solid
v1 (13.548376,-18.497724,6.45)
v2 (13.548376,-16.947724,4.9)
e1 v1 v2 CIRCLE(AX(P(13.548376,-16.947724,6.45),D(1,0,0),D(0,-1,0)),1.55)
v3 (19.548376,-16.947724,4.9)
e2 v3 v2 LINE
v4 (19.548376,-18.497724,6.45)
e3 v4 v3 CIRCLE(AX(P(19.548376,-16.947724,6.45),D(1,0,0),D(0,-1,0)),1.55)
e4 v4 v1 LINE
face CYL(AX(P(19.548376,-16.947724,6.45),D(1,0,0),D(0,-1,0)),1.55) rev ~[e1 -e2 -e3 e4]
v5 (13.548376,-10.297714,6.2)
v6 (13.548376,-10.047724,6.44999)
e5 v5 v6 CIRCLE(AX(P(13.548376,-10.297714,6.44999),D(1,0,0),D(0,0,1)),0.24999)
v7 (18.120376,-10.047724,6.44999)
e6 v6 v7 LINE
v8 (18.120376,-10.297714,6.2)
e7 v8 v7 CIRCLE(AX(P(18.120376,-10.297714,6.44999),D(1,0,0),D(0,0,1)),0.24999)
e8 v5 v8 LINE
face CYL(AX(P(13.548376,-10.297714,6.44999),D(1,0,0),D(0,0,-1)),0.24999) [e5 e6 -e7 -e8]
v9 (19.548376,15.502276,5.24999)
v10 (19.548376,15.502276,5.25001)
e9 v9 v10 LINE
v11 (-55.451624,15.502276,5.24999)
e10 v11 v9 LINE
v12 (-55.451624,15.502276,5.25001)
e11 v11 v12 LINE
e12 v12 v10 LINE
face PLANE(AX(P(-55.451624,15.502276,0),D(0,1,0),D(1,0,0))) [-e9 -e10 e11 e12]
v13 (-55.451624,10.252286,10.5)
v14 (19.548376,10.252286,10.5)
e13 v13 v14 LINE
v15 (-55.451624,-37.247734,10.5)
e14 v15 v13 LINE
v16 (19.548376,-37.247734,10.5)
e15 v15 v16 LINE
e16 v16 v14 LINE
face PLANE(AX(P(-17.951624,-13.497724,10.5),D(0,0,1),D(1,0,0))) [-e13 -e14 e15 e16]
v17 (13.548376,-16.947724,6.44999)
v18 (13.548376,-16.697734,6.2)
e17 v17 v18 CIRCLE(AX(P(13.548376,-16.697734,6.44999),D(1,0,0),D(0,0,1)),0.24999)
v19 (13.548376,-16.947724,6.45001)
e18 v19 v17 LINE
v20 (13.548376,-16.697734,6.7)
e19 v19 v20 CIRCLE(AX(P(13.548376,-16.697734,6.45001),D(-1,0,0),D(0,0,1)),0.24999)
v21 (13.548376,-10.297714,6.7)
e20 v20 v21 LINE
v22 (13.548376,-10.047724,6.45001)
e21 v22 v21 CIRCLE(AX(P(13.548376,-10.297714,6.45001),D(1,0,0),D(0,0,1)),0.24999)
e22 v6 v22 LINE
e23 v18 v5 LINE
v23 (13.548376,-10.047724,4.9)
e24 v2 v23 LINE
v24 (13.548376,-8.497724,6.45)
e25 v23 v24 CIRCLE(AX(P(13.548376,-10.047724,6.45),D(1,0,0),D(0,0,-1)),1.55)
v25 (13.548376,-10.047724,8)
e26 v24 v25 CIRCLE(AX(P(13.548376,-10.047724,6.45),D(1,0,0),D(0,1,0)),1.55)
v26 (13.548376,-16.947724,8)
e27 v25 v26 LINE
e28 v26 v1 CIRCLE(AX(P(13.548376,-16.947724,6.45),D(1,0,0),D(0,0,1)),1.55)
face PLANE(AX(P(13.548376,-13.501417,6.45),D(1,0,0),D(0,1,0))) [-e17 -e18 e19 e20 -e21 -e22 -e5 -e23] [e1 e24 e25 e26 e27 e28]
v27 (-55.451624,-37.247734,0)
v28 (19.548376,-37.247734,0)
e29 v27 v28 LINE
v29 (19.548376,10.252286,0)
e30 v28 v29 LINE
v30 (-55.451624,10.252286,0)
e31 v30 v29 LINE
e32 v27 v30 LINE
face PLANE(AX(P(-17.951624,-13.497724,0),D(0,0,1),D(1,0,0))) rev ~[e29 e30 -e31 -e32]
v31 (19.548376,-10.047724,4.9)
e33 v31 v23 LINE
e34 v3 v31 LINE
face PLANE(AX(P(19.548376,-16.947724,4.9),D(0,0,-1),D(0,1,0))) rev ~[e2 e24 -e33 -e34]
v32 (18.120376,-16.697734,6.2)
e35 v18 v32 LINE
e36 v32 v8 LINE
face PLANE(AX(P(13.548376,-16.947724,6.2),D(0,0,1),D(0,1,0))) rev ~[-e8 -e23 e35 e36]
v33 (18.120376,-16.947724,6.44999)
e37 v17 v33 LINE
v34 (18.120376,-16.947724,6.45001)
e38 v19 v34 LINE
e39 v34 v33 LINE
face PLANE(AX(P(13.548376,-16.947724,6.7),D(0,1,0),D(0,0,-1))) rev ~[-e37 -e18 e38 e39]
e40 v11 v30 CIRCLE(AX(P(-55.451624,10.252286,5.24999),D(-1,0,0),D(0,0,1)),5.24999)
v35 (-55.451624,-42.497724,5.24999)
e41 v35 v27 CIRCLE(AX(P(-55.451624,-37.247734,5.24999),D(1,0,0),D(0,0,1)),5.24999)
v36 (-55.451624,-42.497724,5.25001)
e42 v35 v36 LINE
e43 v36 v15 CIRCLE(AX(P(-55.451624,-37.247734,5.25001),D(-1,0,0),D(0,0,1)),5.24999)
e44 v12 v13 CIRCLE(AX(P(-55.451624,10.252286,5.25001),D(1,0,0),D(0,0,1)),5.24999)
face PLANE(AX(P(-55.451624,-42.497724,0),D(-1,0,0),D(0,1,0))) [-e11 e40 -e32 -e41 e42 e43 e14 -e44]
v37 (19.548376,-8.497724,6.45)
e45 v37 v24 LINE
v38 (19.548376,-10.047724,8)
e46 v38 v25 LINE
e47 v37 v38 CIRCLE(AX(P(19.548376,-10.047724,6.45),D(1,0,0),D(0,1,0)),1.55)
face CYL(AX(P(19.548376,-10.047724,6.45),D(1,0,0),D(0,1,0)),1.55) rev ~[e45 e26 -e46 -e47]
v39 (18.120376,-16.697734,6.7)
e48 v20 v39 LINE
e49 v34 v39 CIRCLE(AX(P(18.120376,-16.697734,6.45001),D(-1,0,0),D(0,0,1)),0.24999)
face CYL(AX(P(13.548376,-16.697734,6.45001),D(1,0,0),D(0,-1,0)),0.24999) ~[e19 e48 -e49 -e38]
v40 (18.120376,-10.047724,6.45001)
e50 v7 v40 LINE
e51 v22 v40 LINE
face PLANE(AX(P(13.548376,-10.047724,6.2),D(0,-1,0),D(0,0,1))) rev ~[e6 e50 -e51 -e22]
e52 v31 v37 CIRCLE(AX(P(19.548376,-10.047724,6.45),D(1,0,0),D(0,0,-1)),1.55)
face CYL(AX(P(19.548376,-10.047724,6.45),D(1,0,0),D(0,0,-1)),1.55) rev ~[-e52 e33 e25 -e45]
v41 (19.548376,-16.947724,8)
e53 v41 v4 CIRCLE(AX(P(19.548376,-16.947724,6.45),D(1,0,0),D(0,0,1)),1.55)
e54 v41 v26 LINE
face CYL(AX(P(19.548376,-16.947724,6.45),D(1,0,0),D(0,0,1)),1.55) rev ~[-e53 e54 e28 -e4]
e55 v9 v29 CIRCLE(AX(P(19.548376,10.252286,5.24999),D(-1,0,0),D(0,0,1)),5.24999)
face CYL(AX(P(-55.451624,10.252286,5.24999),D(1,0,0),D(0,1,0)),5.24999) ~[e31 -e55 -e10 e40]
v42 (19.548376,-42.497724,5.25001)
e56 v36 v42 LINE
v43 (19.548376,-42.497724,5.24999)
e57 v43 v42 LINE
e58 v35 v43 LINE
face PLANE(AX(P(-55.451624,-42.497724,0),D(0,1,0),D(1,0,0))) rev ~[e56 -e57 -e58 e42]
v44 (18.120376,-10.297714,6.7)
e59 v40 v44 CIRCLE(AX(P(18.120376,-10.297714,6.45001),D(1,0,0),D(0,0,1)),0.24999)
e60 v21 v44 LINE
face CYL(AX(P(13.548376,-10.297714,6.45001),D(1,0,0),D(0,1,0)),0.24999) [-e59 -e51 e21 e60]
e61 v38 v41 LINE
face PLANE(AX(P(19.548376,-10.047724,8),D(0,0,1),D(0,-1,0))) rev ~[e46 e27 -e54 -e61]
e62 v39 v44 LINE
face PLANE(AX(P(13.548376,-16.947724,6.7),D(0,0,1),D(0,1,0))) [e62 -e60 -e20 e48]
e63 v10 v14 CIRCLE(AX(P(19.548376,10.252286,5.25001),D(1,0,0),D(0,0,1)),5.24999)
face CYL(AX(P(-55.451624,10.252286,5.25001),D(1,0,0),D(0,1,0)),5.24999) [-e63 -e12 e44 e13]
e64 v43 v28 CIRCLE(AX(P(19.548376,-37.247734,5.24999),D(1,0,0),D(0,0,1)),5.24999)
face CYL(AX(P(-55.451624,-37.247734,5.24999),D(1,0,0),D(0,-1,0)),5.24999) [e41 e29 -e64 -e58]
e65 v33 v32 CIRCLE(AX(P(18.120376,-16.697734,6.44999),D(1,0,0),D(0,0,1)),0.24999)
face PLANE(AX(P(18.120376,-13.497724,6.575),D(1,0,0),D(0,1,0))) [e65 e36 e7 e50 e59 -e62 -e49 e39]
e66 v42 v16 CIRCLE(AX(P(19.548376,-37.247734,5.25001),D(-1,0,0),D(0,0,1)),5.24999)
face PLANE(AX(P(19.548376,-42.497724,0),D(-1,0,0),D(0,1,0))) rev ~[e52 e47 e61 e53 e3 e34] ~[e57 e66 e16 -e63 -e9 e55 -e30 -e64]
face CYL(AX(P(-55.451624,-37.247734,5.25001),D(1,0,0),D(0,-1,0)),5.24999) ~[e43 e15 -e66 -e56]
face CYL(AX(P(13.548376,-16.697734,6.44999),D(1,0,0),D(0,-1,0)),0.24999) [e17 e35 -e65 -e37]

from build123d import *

# Parameters (mm, degrees)
F0_W     = 75
F0_H     = 58
F1_DEPTH = 10.5
F3_R     = 5.24999
F4_DEPTH = 6
F5_W     = 6.9
F5_H     = 0.25
F6_DEPTH = 4.572
F7_R     = 0.24999


# Not quite as in the source:
# - a fillet or chamfer is up to 0.001 mm smaller than in the source, because OpenCascade refuses the exact size


with BuildPart() as f1:
    # F0 (on Top) → F1 (new body)
    with BuildSketch(Plane.XY):
        with Locations((-17.9516240954, -13.4977242947)):
            Rectangle(F0_W, F0_H)
    extrude(amount=F1_DEPTH)

    # F3 (radius 5.25 in the source; OpenCascade refuses exactly that, so slightly less here)
    f3_edges = [f1.edges().sort_by_distance(p)[0] for p in [
        (-17.951624, -42.497724, 10.5),
        (-17.951624, -42.497724, 0),
        (-17.951624, 15.502276, 10.5),
        (-17.951624, 15.502276, 0),
    ]]
    fillet(f3_edges, radius=F3_R)

    # F2 (on face) → F4 (cut)
    with BuildSketch(Plane.YZ.offset(19.5483759046)):
        with BuildLine():
            Line((-10.0477242947, 8), (-13.4977242947, 8))
            Line((-13.4977242947, 8), (-16.9477242947, 8))
            ThreePointArc((-16.9477242947, 8), (-15.8517087838, 7.5460155108), (-15.3977242947, 6.45))
            ThreePointArc((-15.3977242947, 6.45), (-15.8517087838, 5.3539844892), (-16.9477242947, 4.9))
            Line((-16.9477242947, 4.9), (-10.0477242947, 4.9))
            ThreePointArc((-10.0477242947, 4.9), (-11.5977242947, 6.45), (-10.0477242947, 8))
        make_face()
        with BuildLine():
            Line((-10.0477242947, 4.9), (-10.0477242947, 8))
            ThreePointArc((-10.0477242947, 8), (-11.5977242947, 6.45), (-10.0477242947, 4.9))
        make_face()
        with BuildLine():
            ThreePointArc((-8.4977242947, 6.45), (-8.9517087838, 7.5460155108), (-10.0477242947, 8))
            Line((-10.0477242947, 8), (-10.0477242947, 4.9))
            ThreePointArc((-10.0477242947, 4.9), (-8.9517087838, 5.3539844892), (-8.4977242947, 6.45))
        make_face()
        with BuildLine():
            ThreePointArc((-15.3977242947, 6.45), (-15.8517087838, 7.5460155108), (-16.9477242947, 8))
            Line((-16.9477242947, 8), (-16.9477242947, 4.9))
            ThreePointArc((-16.9477242947, 4.9), (-15.8517087838, 5.3539844892), (-15.3977242947, 6.45))
        make_face()
        with BuildLine():
            Line((-16.9477242947, 4.9), (-16.9477242947, 8))
            ThreePointArc((-16.9477242947, 8), (-18.0437398055, 7.5460155108), (-18.4977242947, 6.45))
            ThreePointArc((-18.4977242947, 6.45), (-18.0437398055, 5.3539844892), (-16.9477242947, 4.9))
        make_face()
    extrude(amount=-F4_DEPTH, mode=Mode.SUBTRACT)

    # F5 (on face) → F6 (join)
    with BuildSketch(Plane.YZ.offset(13.5483759046)):
        with Locations((-13.4977242947, 6.575)):
            Rectangle(F5_W, F5_H)
        with Locations((-13.4977242947, 6.325)):
            Rectangle(F5_W, F5_H)
    extrude(amount=F6_DEPTH)

    # F7 (radius 0.25 in the source; OpenCascade refuses exactly that, so slightly less here)
    f7_edges = [f1.edges().sort_by_distance(p)[0] for p in [
        (15.834376, -10.047724, 6.7),
        (15.834376, -10.047724, 6.2),
        (15.834376, -16.947724, 6.7),
        (15.834376, -16.947724, 6.2),
    ]]
    fillet(f7_edges, radius=F7_R)


solid = f1.part
